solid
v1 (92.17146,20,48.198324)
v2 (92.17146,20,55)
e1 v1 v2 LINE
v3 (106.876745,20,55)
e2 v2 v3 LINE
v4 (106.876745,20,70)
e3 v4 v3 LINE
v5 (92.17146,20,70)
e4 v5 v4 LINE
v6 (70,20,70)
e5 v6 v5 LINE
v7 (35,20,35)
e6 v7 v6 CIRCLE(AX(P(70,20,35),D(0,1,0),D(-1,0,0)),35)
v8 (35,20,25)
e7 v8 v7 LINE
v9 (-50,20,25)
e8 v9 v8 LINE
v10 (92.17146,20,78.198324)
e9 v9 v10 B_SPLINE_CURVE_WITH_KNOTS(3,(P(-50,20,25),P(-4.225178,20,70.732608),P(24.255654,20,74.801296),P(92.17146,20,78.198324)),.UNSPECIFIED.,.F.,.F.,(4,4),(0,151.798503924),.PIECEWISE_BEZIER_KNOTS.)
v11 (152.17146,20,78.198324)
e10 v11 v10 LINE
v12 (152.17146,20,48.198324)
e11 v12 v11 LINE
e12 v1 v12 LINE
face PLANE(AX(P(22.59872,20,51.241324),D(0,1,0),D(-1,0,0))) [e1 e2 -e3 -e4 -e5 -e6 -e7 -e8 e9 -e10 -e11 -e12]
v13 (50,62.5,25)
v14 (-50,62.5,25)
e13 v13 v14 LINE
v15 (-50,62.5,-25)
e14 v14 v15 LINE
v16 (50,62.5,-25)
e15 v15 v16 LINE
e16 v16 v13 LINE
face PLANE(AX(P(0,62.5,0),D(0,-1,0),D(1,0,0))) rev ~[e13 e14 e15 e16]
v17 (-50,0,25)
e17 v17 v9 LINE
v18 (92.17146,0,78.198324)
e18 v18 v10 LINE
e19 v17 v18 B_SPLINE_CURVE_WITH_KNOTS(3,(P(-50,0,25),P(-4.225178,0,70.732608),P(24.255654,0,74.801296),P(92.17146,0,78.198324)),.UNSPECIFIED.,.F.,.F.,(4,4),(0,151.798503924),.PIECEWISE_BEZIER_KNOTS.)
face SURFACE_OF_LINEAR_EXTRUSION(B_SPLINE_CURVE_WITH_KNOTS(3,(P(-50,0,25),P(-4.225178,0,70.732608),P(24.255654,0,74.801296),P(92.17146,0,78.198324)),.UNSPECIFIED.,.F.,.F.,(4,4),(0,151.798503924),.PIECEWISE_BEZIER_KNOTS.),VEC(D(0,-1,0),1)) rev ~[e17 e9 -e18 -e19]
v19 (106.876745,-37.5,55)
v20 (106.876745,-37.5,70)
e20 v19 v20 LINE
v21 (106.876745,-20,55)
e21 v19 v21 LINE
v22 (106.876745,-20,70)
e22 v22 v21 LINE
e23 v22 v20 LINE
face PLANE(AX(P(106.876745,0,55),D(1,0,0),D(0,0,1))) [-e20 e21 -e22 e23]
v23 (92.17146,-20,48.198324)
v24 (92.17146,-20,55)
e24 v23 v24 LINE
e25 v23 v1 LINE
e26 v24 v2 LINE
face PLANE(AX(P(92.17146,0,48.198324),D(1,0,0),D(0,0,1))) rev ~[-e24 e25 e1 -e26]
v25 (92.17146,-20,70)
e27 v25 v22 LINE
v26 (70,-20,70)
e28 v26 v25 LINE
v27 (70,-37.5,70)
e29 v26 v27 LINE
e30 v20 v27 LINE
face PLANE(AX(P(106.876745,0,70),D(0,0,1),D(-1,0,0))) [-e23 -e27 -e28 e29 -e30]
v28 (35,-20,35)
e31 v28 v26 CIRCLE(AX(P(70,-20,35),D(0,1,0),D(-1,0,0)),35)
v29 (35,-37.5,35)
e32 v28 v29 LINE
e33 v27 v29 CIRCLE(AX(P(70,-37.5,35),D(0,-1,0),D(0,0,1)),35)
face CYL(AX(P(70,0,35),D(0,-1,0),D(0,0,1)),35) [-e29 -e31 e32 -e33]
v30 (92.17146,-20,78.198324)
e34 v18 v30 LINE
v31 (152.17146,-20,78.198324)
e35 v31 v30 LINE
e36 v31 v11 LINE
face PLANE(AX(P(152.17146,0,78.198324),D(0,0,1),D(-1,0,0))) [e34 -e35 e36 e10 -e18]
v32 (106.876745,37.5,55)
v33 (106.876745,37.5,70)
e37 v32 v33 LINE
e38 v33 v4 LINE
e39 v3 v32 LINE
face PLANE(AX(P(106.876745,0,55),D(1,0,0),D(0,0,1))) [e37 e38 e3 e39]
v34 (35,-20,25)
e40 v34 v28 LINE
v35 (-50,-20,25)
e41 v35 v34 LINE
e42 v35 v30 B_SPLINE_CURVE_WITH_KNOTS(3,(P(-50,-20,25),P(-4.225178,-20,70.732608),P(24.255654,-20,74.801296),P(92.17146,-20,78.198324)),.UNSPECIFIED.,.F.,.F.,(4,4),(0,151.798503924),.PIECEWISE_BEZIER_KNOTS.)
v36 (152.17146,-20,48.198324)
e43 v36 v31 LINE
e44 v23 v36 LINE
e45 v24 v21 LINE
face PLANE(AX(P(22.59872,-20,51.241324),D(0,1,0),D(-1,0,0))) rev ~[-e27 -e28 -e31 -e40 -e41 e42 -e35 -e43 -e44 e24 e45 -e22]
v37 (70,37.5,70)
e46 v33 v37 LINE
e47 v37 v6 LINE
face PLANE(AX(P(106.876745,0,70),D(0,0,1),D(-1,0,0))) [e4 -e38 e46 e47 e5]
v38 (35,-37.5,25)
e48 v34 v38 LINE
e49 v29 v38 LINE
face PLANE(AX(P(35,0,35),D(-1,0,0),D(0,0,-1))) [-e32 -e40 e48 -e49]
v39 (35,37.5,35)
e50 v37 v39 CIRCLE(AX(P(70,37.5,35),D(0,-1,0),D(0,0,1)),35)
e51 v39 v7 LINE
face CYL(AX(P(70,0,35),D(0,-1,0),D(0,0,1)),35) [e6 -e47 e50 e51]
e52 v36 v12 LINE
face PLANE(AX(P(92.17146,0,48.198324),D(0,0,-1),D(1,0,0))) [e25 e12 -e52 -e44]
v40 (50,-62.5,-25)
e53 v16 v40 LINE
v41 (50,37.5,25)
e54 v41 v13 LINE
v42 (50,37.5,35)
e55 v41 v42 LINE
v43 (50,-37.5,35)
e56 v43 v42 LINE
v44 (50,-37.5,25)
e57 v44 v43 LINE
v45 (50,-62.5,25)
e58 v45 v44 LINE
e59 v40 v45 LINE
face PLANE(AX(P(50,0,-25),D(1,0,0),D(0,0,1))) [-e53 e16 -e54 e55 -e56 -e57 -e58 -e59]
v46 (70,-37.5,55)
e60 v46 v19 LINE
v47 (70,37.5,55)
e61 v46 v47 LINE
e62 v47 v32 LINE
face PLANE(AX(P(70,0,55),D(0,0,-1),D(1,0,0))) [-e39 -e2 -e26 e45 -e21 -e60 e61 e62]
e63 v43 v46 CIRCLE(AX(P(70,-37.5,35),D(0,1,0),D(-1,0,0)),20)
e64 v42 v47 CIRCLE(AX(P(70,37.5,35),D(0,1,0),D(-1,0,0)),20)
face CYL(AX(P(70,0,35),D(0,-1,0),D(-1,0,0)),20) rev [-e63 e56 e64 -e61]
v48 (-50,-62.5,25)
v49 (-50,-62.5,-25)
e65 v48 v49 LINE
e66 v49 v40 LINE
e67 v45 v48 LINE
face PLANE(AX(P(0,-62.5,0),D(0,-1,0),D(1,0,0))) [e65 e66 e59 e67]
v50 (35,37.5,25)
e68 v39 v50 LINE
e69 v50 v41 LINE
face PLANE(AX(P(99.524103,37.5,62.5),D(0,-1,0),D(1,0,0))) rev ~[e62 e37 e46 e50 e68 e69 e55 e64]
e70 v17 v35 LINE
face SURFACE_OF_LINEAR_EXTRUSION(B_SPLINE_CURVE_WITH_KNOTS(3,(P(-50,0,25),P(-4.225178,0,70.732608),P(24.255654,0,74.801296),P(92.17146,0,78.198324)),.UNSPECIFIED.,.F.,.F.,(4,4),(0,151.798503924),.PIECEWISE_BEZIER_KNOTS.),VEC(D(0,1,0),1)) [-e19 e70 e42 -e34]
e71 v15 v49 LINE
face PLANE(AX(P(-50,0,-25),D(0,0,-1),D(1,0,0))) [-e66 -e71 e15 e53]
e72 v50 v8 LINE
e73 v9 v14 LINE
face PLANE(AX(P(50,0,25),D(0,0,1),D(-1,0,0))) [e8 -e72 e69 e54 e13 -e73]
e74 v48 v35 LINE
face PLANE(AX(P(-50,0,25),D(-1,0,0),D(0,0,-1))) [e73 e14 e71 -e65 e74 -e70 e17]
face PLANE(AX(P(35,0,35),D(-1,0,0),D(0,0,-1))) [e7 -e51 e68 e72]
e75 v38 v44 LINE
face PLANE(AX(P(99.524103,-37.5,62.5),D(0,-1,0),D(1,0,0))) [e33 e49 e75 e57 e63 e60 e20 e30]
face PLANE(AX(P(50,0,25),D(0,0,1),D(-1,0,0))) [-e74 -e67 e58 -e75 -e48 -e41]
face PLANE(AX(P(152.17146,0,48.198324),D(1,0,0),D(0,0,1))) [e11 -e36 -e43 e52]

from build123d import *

# Parameters (mm, degrees)
F1_DEPTH = 62.5
F0_W     = 14.7052842798
F0_H     = 15
F2_DEPTH = 37.5
F0_H_2   = 6.8016763031
F0_H_3   = 8.1983236969
F3_DEPTH = 20


with BuildPart() as f1:
    # F0 (on Front) → F1 (new body, symmetric)
    with BuildSketch(Plane.XZ):
        Polygon((-50, 25), (-50, -25), (50, -25), (50, 25), (35, 25), align=None)
    extrude(amount=F1_DEPTH, both=True)

    # F0 (on Front) → F2 (join, symmetric)
    with BuildSketch(Plane.XZ):
        with Locations((99.52410253, 62.5)):
            Rectangle(F0_W, F0_H)
        with BuildLine():
            Line((35, 25), (50, 25))
            Line((50, 25), (50, 35))
            ThreePointArc((50, 35), (55.8578643763, 49.1421356237), (70, 55))
            Line((70, 55), (92.1714603901, 55))
            Line((92.1714603901, 55), (92.1714603901, 70))
            Line((92.1714603901, 70), (70, 70))
            ThreePointArc((70, 70), (45.2512626585, 59.7487373415), (35, 35))
            Line((35, 35), (35, 25))
        make_face()
    extrude(amount=F2_DEPTH, both=True)

    # F0 (on Front) → F3 (join, symmetric)
    with BuildSketch(Plane.XZ):
        with BuildLine():
            add(Edge.make_bspline(
                [(-50, 25), (-4.2251776904, 70.7326084375), (24.2556538433, 74.8012959957), (92.1714603901, 78.1983236969)],
                knots=[0, 0, 0, 0, 151.7985039241, 151.7985039241, 151.7985039241, 151.7985039241], degree=3))
            Line((-50, 25), (35, 25))
            Line((35, 25), (35, 35))
            ThreePointArc((35, 35), (45.2512626585, 59.7487373415), (70, 70))
            Line((70, 70), (92.1714603901, 70))
            Line((92.1714603901, 70), (92.1714603901, 78.1983236969))
        make_face()
        Polygon((106.8767446699, 48.1983236969), (137.2651457787, 48.1983236969), (152.1714603901, 48.1983236969), (152.1714603901, 78.1983236969), (127.8208345175, 78.1983236969), (106.8767446699, 78.1983236969), (106.8767446699, 70), (106.8767446699, 55), align=None)
        with Locations((99.52410253, 51.5991618484)):
            Rectangle(F0_W, F0_H_2)
        with Locations((99.52410253, 74.0991618484)):
            Rectangle(F0_W, F0_H_3)
    extrude(amount=F3_DEPTH, both=True)


solid = f1.part
